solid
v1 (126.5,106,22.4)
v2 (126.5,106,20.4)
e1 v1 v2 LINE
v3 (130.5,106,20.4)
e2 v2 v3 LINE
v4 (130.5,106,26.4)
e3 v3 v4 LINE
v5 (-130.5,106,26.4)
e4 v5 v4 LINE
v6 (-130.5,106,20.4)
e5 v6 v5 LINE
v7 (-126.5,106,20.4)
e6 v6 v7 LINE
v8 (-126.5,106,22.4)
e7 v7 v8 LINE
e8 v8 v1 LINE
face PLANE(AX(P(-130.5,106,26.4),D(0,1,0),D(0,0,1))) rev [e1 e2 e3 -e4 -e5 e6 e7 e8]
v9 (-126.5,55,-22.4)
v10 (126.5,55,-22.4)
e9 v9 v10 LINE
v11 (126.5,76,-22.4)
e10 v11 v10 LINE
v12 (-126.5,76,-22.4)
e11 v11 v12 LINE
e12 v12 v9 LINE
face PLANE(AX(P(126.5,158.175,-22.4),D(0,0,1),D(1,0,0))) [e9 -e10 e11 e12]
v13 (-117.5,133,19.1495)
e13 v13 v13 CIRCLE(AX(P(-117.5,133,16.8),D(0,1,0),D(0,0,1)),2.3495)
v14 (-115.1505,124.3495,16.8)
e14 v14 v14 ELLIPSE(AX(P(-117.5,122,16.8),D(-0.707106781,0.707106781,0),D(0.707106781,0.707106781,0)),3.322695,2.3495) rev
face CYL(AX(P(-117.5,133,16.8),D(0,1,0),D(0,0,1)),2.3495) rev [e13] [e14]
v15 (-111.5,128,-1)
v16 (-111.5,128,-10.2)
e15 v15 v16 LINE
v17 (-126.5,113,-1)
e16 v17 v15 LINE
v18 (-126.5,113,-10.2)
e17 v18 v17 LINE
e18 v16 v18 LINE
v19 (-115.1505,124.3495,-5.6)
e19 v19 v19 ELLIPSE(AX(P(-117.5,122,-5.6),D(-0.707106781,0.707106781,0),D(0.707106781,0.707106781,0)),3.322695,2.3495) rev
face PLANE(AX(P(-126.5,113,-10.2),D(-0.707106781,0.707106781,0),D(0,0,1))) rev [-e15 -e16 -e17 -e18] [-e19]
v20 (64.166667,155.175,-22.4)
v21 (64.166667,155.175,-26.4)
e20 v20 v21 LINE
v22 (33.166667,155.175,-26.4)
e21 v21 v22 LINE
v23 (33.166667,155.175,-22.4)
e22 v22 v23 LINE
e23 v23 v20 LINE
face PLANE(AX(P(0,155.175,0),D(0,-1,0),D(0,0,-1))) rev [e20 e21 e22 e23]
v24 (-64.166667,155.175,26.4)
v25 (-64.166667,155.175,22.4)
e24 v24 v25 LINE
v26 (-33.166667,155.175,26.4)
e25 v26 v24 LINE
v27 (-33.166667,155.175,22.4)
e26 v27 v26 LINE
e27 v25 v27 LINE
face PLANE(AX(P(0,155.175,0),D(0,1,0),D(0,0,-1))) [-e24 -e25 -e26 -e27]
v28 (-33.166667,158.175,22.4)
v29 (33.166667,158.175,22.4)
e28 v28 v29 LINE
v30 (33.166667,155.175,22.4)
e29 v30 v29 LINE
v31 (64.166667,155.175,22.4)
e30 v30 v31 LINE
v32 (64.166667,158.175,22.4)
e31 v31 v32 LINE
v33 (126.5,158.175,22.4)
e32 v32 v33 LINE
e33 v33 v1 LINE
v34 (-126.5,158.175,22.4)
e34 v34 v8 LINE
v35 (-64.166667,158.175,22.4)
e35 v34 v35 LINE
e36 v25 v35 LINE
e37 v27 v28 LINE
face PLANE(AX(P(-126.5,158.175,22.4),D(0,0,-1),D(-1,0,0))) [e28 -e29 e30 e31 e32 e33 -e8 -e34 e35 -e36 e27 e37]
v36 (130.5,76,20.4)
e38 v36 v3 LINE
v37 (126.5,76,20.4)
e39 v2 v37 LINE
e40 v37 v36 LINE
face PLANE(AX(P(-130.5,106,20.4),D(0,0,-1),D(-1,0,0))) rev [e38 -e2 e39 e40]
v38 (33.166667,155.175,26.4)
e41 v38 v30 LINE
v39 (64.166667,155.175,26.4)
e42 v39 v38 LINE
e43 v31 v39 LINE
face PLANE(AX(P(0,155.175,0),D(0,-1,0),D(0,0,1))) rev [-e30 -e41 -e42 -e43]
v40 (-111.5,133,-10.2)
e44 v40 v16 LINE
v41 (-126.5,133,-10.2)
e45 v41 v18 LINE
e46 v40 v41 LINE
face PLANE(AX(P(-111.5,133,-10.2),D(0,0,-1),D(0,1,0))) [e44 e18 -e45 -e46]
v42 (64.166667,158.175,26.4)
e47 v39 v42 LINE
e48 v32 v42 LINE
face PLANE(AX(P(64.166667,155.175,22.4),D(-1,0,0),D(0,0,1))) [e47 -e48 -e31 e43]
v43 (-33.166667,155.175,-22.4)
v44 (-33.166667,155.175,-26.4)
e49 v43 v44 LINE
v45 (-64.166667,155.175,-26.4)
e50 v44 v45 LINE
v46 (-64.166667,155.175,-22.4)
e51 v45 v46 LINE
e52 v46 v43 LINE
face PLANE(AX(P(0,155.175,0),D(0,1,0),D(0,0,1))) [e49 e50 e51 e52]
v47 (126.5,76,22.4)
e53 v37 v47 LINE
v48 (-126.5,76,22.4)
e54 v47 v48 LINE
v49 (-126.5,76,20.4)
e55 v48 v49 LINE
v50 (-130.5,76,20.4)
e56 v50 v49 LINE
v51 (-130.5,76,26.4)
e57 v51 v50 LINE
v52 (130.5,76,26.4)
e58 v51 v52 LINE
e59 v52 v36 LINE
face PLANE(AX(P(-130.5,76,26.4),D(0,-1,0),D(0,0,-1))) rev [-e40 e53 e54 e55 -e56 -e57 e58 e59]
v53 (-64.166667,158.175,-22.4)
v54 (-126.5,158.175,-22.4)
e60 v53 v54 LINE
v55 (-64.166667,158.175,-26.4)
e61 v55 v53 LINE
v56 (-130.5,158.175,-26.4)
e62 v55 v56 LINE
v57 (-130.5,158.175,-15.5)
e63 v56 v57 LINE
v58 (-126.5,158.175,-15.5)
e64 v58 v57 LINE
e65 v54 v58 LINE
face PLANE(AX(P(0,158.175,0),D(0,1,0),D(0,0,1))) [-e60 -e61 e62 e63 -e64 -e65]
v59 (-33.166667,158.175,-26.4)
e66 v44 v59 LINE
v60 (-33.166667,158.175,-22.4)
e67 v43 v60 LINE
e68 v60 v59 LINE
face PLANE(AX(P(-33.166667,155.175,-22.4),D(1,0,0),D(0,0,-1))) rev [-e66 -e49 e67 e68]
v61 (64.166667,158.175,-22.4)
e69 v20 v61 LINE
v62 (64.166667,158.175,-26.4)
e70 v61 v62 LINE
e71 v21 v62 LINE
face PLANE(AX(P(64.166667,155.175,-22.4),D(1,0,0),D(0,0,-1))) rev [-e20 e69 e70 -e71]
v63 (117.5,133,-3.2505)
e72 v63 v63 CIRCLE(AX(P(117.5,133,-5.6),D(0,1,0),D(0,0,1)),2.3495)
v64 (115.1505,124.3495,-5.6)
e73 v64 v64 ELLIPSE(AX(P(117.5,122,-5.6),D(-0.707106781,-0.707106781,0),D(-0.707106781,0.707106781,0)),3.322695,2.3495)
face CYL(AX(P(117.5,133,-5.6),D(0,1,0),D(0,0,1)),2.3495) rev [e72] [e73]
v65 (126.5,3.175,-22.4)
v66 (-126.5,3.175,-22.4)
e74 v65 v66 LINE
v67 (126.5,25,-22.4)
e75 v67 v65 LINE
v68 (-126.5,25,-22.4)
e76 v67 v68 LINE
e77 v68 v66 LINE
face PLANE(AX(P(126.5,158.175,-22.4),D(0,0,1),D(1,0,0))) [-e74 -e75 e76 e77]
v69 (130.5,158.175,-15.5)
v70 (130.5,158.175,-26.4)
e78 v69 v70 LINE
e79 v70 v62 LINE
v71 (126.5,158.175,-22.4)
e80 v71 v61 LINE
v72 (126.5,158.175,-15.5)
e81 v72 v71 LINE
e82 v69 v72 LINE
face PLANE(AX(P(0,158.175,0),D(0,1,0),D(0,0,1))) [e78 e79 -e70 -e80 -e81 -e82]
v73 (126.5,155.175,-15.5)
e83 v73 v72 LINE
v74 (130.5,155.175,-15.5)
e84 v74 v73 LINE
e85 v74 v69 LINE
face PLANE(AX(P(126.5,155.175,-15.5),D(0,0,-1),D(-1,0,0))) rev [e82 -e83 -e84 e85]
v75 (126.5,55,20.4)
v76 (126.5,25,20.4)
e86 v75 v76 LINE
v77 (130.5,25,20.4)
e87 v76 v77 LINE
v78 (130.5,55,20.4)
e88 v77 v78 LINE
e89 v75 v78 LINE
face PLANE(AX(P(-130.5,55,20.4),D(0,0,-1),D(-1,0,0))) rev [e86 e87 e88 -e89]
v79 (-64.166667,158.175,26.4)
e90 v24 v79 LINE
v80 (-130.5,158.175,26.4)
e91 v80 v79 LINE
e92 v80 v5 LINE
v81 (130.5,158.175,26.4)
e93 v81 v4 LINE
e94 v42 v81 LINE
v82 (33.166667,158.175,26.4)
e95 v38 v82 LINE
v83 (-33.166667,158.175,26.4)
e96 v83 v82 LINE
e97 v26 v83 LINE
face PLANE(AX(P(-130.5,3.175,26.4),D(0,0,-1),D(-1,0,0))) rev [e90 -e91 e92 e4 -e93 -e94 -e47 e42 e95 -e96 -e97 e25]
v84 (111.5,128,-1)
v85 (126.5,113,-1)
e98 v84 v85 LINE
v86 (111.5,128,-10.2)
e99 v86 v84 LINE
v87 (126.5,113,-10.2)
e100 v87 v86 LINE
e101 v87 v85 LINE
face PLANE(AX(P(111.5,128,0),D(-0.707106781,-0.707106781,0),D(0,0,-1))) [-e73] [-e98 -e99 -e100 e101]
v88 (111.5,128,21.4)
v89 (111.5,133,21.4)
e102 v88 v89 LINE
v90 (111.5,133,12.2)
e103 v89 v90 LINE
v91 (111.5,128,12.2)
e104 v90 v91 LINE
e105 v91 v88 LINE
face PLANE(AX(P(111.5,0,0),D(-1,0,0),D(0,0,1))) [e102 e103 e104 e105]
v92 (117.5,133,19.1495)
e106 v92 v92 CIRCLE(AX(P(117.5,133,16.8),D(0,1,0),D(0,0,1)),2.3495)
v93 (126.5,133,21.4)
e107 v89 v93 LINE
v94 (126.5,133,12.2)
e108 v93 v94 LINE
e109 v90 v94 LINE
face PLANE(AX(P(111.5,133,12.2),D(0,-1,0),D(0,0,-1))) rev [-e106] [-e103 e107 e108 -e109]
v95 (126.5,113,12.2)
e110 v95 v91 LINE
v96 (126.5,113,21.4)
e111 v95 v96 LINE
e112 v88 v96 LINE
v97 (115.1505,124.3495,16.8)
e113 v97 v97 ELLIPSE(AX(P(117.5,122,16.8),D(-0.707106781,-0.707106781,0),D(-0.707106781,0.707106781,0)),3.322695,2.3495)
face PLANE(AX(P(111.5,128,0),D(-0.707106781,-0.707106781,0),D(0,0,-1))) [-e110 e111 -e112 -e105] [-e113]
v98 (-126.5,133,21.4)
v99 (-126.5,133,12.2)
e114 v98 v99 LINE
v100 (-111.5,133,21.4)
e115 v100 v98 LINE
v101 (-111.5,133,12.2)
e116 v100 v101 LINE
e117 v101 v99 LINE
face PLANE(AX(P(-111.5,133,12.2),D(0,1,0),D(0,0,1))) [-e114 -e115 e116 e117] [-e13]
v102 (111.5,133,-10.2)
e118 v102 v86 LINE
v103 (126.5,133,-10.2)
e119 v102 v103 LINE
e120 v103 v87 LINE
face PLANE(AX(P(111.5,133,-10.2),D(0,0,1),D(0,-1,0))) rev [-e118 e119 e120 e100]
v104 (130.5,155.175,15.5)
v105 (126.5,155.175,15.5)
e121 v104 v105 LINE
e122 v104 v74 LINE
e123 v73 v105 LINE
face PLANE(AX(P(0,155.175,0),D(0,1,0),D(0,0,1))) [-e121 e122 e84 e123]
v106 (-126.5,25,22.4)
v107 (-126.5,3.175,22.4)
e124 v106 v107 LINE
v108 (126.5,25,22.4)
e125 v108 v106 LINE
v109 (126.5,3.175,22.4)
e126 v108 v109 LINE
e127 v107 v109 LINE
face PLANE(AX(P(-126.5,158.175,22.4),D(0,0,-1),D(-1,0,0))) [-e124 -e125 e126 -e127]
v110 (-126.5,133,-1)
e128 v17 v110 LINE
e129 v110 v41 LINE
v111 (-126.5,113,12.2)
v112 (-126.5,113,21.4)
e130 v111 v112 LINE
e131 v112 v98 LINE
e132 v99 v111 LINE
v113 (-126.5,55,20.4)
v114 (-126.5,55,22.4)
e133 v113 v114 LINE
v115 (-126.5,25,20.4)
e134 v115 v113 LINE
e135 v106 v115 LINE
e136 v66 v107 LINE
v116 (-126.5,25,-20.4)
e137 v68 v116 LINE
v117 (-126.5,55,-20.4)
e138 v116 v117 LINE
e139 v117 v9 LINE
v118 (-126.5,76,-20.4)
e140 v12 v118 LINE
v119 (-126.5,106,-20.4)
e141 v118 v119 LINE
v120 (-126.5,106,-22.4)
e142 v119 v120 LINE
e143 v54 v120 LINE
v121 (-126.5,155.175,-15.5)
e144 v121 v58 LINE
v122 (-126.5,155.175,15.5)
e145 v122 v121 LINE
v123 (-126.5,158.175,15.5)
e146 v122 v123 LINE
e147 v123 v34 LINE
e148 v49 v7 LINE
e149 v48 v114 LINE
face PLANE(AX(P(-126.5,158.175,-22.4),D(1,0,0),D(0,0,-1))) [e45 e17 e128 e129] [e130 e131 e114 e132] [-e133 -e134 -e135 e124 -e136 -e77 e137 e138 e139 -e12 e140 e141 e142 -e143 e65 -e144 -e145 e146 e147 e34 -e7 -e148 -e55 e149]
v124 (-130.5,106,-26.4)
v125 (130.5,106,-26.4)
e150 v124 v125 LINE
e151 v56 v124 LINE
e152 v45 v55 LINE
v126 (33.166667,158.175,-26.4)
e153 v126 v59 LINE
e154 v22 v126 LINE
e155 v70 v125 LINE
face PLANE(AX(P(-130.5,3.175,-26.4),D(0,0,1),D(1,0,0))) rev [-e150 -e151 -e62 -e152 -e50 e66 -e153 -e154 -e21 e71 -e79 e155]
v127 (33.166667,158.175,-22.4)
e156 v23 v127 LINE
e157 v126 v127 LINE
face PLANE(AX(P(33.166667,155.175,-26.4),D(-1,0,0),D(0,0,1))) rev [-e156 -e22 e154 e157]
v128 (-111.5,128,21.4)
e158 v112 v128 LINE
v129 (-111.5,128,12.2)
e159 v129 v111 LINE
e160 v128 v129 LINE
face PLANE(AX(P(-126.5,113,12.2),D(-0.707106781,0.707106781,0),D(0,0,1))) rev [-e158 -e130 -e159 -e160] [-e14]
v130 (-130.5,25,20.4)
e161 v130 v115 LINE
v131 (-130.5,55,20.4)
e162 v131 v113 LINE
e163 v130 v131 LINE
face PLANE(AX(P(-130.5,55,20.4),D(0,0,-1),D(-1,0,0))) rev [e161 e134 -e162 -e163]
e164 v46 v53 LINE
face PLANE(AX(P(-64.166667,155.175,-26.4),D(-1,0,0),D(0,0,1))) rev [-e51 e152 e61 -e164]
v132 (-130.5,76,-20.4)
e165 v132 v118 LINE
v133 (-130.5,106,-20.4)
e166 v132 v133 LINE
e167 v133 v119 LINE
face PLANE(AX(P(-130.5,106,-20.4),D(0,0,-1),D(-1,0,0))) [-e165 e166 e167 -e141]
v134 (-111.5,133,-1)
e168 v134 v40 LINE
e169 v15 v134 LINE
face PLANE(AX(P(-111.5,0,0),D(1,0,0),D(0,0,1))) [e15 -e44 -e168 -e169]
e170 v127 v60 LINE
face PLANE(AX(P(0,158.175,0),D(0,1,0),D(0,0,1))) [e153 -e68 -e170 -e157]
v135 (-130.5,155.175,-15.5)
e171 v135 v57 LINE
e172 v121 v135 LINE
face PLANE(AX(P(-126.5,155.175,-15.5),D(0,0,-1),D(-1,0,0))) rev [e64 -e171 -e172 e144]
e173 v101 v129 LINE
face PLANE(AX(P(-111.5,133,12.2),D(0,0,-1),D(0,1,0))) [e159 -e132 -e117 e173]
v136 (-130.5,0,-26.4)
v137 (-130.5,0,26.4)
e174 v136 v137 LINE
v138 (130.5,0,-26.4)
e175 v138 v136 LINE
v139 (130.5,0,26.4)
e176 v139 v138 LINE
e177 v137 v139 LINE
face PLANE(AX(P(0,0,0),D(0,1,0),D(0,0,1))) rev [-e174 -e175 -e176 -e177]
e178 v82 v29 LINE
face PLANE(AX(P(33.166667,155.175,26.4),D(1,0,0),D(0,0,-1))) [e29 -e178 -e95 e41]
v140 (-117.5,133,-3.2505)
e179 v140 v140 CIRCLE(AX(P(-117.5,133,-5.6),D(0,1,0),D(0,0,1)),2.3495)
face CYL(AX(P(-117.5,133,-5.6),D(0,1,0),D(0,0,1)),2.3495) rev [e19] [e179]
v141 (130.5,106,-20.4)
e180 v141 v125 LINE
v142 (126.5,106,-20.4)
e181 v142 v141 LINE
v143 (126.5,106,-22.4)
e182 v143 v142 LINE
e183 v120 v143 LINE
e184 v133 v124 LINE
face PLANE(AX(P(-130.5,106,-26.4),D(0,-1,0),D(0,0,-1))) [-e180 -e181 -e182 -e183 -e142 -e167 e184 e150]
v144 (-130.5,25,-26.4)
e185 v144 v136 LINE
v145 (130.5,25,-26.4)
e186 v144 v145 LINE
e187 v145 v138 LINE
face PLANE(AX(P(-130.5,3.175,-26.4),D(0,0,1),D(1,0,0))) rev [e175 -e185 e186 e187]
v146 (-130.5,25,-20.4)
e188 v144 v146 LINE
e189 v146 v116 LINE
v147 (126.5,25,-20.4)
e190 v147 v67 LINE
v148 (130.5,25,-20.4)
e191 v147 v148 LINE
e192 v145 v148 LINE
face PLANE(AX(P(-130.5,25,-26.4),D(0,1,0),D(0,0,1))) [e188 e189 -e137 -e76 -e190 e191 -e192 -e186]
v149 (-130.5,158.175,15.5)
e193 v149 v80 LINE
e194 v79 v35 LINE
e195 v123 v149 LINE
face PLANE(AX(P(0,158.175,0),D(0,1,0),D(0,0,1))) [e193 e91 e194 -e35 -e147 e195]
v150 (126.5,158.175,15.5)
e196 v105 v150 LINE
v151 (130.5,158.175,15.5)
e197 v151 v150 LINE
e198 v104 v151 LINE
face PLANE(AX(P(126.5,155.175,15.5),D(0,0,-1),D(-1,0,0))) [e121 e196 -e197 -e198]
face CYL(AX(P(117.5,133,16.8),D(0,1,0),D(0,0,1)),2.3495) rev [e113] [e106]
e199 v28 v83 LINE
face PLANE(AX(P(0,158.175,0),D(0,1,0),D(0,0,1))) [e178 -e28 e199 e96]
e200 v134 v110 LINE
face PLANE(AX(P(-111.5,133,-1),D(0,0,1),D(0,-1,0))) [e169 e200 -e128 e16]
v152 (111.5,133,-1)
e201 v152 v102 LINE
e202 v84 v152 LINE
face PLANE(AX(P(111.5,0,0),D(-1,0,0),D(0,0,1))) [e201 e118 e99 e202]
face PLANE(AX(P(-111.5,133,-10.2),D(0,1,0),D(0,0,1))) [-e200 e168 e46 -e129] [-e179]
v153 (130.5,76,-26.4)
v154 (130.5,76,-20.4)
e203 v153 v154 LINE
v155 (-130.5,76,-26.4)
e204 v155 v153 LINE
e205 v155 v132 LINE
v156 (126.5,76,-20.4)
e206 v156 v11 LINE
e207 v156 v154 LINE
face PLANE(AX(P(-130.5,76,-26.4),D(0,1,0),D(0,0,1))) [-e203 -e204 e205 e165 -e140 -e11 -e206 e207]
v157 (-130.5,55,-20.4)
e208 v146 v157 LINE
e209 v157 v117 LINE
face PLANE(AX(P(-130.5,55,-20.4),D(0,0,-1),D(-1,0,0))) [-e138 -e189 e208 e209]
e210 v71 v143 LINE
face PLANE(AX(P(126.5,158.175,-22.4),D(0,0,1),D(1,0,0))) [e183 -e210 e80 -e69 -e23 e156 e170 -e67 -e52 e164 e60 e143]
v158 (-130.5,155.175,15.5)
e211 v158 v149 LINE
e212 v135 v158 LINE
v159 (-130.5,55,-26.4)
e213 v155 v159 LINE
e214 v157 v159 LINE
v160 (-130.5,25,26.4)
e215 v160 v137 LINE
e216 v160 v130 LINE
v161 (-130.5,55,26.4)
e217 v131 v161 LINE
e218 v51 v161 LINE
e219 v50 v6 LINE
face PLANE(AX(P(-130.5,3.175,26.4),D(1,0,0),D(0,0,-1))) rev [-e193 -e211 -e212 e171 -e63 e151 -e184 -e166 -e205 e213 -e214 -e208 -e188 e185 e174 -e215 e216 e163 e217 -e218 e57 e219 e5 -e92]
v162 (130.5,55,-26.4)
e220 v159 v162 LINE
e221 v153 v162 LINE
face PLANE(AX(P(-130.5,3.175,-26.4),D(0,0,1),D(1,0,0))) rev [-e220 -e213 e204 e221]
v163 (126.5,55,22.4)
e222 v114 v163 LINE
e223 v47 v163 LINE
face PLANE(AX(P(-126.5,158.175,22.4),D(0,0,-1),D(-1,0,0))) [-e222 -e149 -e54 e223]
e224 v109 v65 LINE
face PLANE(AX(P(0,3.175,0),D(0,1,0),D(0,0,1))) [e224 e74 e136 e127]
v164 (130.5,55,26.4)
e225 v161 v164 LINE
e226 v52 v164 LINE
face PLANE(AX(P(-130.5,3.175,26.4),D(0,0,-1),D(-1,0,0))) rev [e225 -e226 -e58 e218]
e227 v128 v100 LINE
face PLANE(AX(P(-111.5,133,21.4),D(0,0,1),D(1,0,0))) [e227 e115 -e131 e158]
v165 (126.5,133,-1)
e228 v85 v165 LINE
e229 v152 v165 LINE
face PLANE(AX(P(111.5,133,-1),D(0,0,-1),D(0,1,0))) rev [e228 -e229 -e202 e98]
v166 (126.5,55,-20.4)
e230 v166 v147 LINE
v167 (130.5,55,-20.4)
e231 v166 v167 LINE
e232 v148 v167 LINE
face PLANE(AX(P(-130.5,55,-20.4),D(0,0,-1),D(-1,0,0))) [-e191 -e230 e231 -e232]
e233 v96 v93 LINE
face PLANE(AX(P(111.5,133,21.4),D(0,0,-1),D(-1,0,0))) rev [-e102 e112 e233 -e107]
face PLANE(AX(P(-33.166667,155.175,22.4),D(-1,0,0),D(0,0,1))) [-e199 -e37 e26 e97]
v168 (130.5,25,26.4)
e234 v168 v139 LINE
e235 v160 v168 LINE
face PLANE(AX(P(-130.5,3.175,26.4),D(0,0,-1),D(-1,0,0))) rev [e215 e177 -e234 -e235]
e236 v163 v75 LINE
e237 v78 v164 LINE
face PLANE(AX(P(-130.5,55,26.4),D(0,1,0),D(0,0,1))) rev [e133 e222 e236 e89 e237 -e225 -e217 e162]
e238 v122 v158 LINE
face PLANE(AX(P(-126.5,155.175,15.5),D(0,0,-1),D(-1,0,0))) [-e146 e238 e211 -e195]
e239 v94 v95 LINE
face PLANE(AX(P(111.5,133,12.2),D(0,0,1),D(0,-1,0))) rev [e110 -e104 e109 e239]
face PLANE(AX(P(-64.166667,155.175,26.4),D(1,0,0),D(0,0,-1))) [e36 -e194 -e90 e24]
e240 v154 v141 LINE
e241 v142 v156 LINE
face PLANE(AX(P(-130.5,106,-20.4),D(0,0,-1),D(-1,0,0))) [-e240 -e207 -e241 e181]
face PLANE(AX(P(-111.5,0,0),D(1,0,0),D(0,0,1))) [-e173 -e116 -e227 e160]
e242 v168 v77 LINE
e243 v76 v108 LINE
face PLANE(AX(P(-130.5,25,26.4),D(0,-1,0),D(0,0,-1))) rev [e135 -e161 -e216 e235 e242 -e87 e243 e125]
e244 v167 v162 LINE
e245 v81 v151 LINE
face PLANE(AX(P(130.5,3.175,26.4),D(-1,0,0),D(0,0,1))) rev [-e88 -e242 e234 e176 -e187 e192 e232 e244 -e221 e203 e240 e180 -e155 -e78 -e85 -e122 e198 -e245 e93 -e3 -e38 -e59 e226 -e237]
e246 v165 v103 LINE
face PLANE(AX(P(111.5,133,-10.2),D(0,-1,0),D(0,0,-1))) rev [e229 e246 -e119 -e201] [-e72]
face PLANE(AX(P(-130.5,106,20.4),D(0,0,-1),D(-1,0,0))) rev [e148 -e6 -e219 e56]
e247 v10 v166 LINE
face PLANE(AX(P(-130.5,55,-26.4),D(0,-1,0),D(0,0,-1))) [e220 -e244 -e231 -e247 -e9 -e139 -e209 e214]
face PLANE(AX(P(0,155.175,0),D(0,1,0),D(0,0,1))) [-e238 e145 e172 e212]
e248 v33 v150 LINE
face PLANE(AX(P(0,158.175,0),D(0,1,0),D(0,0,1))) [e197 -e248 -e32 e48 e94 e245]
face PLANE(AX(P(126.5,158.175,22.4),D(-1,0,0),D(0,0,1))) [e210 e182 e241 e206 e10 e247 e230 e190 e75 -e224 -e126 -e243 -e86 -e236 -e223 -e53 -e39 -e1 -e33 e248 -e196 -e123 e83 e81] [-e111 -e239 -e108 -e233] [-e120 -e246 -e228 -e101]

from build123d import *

# Parameters (mm, degrees)
SKETCH1_W                        = 261
SKETCH1_H                        = 52.8
BOSS_EXTRUDE1_DEPTH              = 3.175
SKETCH2_W                        = 261
SKETCH2_H                        = 52.8
SKETCH2_W_2                      = 253
SKETCH2_H_2                      = 44.8
BOSS_EXTRUDE2_DEPTH              = 155
SKETCH3_W                        = 6
SKETCH3_H                        = 30
CUT_EXTRUDE1_DEPTH               = 307.328729676
SKETCH4_W                        = 9.2
SKETCH4_H                        = 20
BOSS_EXTRUDE3_DEPTH              = 15
CHAMFER2_SIZE                    = 15
F_13_0_185_DIAMETER_HOLE1_REACH  = 190.192
F_13_0_185_DIAMETER_HOLE1_BORE_R = 2.3495
LPATTERN1_COUNT                  = 2
LPATTERN1_PITCH                  = 22.4
SKETCH7_W                        = 4
SKETCH7_H                        = 15.5
SKETCH7_W_2                      = 31
SKETCH7_H_2                      = 4
CUT_EXTRUDE2_DEPTH               = 3


# Read off the part's stored shape, not the designer's step: Mirror2
with BuildPart() as part:
    # Sketch1 → Boss-Extrude1 (new body)
    with BuildSketch(Plane(origin=(0, 0, 0), x_dir=(1, 0, 0), z_dir=(0, 1, 0))):
        Rectangle(SKETCH1_W, SKETCH1_H)
    extrude(amount=BOSS_EXTRUDE1_DEPTH)

    # Sketch2 → Boss-Extrude2 (add)
    with BuildSketch(Plane(origin=(0, 3.175, 0), x_dir=(1, 0, 0), z_dir=(0, 1, 0))):
        Rectangle(SKETCH2_W, SKETCH2_H)
        Rectangle(SKETCH2_W_2, SKETCH2_H_2, mode=Mode.SUBTRACT)
    extrude(amount=BOSS_EXTRUDE2_DEPTH)

    # Sketch3 → Cut-Extrude1 (cut, through all)
    with BuildSketch(Plane(origin=(130.5, 0, 0), x_dir=(0, 0, -1), z_dir=(1, 0, 0))):
        with Locations((-23.4, 91)):
            Rectangle(SKETCH3_W, SKETCH3_H)
        with Locations((-23.4, 40)):
            Rectangle(SKETCH3_W, SKETCH3_H)
    cut_extrude1 = extrude(amount=-CUT_EXTRUDE1_DEPTH, mode=Mode.SUBTRACT)

    # Mirror1: Cut-Extrude1 across plane
    add(cut_extrude1.mirror(Plane.XY), mode=Mode.SUBTRACT)

    # Sketch4 → Boss-Extrude3 (add)
    with BuildSketch(Plane.ZY.offset(-126.5)):
        with Locations((-5.6, 123)):
            Rectangle(SKETCH4_W, SKETCH4_H)
        with Locations((16.8, 123)):
            Rectangle(SKETCH4_W, SKETCH4_H)
    extrude(amount=BOSS_EXTRUDE3_DEPTH)

    # Chamfer2
    chamfer2_edges = [part.edges().sort_by_distance(p)[0] for p in [
        (111.5, 113, 16.8),
        (111.5, 113, -5.6),
    ]]
    chamfer(chamfer2_edges, length=CHAMFER2_SIZE - 0.0001)  # a hair under: the kernel refuses the full size

    # #13 (0.185) Diameter Hole1 bore → #13 (0.185) Diameter Hole1 (cut, up to next)
    with BuildSketch(Plane(origin=(0, 133, 0), x_dir=(1, 0, 0), z_dir=(0, 1, 0)), mode=Mode.PRIVATE) as f_13_0_185_diameter_hole1_sk1:
        with Locations((117.5, -16.8)):
            Circle(F_13_0_185_DIAMETER_HOLE1_BORE_R)
    f_13_0_185_diameter_hole1_tool1 = extrude(f_13_0_185_diameter_hole1_sk1.sketch, amount=-F_13_0_185_DIAMETER_HOLE1_REACH, mode=Mode.PRIVATE) & part.part
    f_13_0_185_diameter_hole1 = f_13_0_185_diameter_hole1_tool1.solids().sort_by_distance((117.5, 133, 16.8))[0]
    add(f_13_0_185_diameter_hole1, mode=Mode.SUBTRACT)

    # LPattern1: #13 (0.185) Diameter Hole1 ×2
    with Locations(*[(0, 0, -i * LPATTERN1_PITCH) for i in range(1, LPATTERN1_COUNT)]):
        add(f_13_0_185_diameter_hole1, mode=Mode.SUBTRACT)

    # Mirror2: part across plane


with BuildPart() as part_1:
    add(part.part)
    add(part.part.mirror(Plane(origin=(0, 0, 0), x_dir=(0, 0, 1), z_dir=(1, 0, 0))))

    # Sketch7 → Cut-Extrude2 (cut)
    with BuildSketch(Plane(origin=(0, 158.175, 0), x_dir=(1, 0, 0), z_dir=(0, 1, 0))):
        with Locations((128.5, 7.75)):
            Rectangle(SKETCH7_W, SKETCH7_H)
        with Locations((48.666666667, 24.4)):
            Rectangle(SKETCH7_W_2, SKETCH7_H_2)
        with Locations((-128.5, 7.75)):
            Rectangle(SKETCH7_W, SKETCH7_H)
        with Locations((-48.666666667, 24.4)):
            Rectangle(SKETCH7_W_2, SKETCH7_H_2)
    cut_extrude2 = extrude(amount=-CUT_EXTRUDE2_DEPTH, mode=Mode.SUBTRACT)

    # Mirror3: Cut-Extrude2 across plane
    add(cut_extrude2.mirror(Plane.XY), mode=Mode.SUBTRACT)


solid = part_1.part
